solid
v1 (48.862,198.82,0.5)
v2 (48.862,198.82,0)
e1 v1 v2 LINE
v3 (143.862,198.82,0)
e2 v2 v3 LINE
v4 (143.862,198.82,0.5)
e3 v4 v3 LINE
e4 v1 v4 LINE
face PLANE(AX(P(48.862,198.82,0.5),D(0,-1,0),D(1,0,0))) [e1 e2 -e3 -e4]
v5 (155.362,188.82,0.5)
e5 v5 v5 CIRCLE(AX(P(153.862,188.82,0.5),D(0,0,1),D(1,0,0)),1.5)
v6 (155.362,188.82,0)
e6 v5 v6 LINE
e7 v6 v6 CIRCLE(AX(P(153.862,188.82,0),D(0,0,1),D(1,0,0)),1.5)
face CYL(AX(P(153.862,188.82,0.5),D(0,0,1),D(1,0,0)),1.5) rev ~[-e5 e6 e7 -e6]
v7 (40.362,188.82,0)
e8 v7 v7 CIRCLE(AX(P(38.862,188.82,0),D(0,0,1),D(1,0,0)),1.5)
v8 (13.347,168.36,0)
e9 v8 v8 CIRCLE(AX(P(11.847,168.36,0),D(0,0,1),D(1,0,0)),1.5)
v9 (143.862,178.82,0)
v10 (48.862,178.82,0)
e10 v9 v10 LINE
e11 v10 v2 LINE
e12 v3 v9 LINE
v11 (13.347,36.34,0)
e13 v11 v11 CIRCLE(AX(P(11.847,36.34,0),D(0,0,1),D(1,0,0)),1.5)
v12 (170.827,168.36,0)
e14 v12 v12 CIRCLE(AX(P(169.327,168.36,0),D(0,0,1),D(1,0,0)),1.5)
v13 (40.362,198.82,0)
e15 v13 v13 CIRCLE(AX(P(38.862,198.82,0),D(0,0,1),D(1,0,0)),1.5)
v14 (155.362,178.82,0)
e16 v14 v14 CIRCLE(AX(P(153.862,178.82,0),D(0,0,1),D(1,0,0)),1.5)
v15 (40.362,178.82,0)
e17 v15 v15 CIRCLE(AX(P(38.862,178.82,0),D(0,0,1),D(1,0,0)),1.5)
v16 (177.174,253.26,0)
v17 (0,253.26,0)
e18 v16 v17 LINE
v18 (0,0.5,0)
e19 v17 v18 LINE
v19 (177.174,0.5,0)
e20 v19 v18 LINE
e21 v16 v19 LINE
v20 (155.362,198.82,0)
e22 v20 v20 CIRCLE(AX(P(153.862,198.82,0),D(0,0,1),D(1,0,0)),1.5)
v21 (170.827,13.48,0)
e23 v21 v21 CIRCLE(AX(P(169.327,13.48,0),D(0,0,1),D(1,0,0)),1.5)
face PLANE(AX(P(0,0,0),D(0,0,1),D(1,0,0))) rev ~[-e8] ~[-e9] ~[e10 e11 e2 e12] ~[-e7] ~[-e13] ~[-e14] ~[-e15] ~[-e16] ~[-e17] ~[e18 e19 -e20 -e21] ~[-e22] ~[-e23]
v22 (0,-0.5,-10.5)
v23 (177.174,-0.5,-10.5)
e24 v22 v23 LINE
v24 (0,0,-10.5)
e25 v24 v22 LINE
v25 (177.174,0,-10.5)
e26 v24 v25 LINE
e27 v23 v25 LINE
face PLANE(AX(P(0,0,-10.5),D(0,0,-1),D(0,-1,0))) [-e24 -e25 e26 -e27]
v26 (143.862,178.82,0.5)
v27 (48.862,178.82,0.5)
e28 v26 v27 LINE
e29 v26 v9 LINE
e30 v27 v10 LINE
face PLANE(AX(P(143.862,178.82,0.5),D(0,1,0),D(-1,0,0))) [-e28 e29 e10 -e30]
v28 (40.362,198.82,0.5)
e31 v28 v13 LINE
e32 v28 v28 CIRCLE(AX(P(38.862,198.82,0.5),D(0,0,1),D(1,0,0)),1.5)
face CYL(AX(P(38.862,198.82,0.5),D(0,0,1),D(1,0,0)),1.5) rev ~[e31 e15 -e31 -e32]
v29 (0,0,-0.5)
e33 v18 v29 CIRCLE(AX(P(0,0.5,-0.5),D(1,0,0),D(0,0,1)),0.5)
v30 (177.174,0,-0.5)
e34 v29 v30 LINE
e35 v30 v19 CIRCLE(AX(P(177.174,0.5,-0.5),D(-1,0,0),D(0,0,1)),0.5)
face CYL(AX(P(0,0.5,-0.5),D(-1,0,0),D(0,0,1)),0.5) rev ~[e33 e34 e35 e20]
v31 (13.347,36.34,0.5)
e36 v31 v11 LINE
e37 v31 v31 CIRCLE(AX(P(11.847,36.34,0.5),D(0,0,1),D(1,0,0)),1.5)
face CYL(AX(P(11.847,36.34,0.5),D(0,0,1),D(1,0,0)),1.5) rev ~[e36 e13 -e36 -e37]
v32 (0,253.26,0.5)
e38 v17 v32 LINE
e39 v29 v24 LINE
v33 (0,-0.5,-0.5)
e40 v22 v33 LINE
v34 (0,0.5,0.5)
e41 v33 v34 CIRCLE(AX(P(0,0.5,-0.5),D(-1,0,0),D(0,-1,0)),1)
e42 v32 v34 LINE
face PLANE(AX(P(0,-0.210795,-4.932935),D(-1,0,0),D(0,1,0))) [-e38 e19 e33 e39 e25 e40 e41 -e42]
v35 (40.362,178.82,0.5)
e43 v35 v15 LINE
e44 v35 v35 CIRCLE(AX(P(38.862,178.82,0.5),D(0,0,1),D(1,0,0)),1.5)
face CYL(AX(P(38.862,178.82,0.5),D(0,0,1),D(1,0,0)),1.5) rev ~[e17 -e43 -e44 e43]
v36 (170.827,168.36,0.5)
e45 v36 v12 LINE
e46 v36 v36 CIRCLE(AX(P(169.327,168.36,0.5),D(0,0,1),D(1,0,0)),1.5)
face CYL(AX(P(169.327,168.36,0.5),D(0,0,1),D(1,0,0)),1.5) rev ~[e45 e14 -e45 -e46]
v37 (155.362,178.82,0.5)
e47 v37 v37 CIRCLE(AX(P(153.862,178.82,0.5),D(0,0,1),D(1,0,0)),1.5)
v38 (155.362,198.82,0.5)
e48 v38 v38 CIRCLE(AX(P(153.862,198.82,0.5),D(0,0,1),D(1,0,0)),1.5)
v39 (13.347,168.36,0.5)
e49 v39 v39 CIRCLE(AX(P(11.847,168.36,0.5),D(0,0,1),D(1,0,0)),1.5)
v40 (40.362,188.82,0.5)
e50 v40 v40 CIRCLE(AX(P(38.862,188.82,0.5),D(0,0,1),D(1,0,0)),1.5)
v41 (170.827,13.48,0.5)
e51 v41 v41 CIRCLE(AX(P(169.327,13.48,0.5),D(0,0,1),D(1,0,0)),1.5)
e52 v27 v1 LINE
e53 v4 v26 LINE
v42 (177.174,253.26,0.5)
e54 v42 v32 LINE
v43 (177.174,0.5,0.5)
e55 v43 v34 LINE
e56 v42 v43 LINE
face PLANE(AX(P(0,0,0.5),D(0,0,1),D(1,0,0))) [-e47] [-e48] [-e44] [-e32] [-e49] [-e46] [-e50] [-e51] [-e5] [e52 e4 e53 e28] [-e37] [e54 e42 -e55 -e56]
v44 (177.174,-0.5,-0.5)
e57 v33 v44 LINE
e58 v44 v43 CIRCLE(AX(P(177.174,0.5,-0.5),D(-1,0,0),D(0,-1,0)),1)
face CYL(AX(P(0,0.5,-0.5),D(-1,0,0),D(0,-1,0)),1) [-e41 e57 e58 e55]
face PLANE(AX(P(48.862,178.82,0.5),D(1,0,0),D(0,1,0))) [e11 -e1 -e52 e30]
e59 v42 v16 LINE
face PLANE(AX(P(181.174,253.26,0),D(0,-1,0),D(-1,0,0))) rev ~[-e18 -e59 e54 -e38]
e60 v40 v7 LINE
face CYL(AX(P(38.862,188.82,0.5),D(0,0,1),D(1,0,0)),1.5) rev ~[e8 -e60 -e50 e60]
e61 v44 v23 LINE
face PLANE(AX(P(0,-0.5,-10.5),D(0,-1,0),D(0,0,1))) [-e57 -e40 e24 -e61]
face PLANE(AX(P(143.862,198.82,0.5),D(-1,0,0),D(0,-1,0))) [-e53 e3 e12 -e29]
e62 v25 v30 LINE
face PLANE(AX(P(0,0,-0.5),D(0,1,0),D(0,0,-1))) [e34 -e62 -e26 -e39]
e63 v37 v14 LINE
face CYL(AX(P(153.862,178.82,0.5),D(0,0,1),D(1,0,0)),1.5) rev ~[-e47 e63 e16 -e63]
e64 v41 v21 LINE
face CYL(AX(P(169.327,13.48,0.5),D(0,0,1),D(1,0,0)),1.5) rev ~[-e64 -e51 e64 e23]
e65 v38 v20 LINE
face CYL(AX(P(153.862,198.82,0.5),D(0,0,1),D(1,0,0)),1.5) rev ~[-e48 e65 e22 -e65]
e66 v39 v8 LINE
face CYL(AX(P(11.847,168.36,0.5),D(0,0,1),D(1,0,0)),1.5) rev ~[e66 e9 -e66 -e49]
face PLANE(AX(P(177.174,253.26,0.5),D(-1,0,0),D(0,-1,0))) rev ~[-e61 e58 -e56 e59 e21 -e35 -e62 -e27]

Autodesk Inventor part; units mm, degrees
ref_plane "YZ Plane" through (0, 0, 0) normal (1, 0, 0) x (0, 1, 0)
ref_plane "XZ Plane" through (0, 0, 0) normal (0, 1, 0) x (-1, 0, 0)
ref_plane "XY Plane" through (0, 0, 0) normal (0, 0, 1) x (1, 0, 0)
sketch "Sketch1" plane through (0, 0, 0) normal (0, 0, 1) x (1, 0, 0)
  line L0 (0, 0) -> (181.174, 0)
  line L1 (181.174, 0) -> (181.174, 253.26)
  line L2 (181.174, 253.26) -> (0, 253.26)
  line L3 (0, 253.26) -> (0, 0)
  dimension "d0" = 181.174
  dimension "d1" = 253.26
extrude "Plate1" add sketch "Sketch1" along normal blind 0.5
sketch "Sketch3" plane through (0, 0, 0.5) normal (0, 0, 1) x (1, 0, 0)
  line L0 (181.174, 253.26) -> (181.174, 0) projected
  line L1 (181.174, 253.26) -> (181.174, 168.36) construction
  line L2 (181.174, 168.36) -> (169.327, 168.36) construction
  line L3 (169.327, 168.36) -> (11.847, 168.36) construction
  line L4 (169.327, 168.36) -> (169.327, 13.48) construction
  circle A0 centre (169.327, 13.48) radius 1.5
  circle A1 centre (169.327, 168.36) radius 1.5
  circle A2 centre (11.847, 168.36) radius 1.5
  point P0 (181.174, 0.5)
  point P1 (0, 0)
  dimension "d13" = 84.9
  dimension "d14" = 11.847
  dimension "d15" = 157.48
  dimension "d16" = 154.88
  dimension "d17" = 3
  dimension "d18" = 3
  dimension "d19" = 3
extrude "Extrusion1" cut sketch "Sketch3" against normal blind 10
sketch "Sketch5" plane through (0, 0, 0.5) normal (0, 0, 1) x (1, 0, 0)
  circle A0 centre (11.847, 168.36) radius 1.5 projected
  line L0 (11.847, 168.36) -> (11.847, 35.808) construction
  line L1 (11.847, 168.36) -> (144.399, 168.36) construction
  line L2 (11.847, 35.808) -> (11.847, 36.34) construction
  circle A1 centre (11.847, 36.34) radius 1.5
  point P0 (0, 0)
  dimension "d28" = 90
  dimension "d32" = 0.532
  dimension "d33" = 3
extrude "Extrusion4" cut sketch "Sketch5" against normal blind 10 contours A1
sketch "Sketch7" plane through (0, 0, 0) normal (0, -1, 0) x (1, 0, 0)
  line L0 (181.174, 0) -> (0, 0)
  line L1 (0, 0) -> (0, -10.5)
  line L2 (0, -10.5) -> (181.174, -10.5)
  line L3 (181.174, -10.5) -> (181.174, 0)
edge flange "Flange2" height 11 angle 90 thickness 0.5 bend radius 0.5 thickness toward (0, -1, 0) relief tear relief width 0.5 relief depth 0.25 edges at (90.587, 0, 0) wall of the first edge with corners at (181.174, 0, 0) (0, 0, 0) (0, 0, -10.5) (181.174, 0, -10.5)
bend "Bend2"
corner "Corner2"
sketch "Sketch8" plane through (0, 0, 0.5) normal (0, 0, 1) x (1, 0, 0)
  line L0 (181.174, 253.26) -> (0, 253.26) projected
  line L1 (181.174, 253.26) -> (177.174, 253.26)
  line L2 (177.174, 253.26) -> (177.174, -19.1311)
  line L3 (177.174, -19.1311) -> (181.174, -19.1311)
  line L4 (181.174, -19.1311) -> (181.174, 253.26)
  point P0 (0, 0)
  dimension "d46" = 4
extrude "Extrusion5" cut sketch "Sketch8" against normal through all
sketch "Sketch9" plane through (0, 0, 0.5) normal (0, 0, 1) x (1, 0, 0)
  line L0 (177.174, 253.26) -> (177.174, 198.82) construction
  line L1 (177.174, 253.26) -> (177.174, 0.5) construction
  line L2 (177.174, 198.82) -> (153.862, 198.82) construction
  circle A0 centre (153.862, 198.82) radius 1.5
  line L3 (153.862, 198.82) -> (153.862, 188.82) construction
  line L4 (153.862, 188.82) -> (153.862, 178.82) construction
  circle A1 centre (153.862, 188.82) radius 1.5
  circle A2 centre (153.862, 178.82) radius 1.5
  line L5 (153.862, 198.82) -> (38.862, 198.82) construction
  circle A3 centre (38.862, 198.82) radius 1.5
  circle A4 centre (38.862, 188.82) radius 1.5
  circle A5 centre (38.862, 178.82) radius 1.5
  point P0 (0, 0)
  dimension "d49" = 54.44
  dimension "d50" = 23.312
  dimension "d55" = 3
  dimension "d58" = 10
  dimension "d59" = 10
  dimension "d60" = 3
  dimension "d61" = 3
  dimension "d62" = 115
  dimension "d63" = 3
  dimension "d64" = 3
  dimension "d65" = 3
extrude "Extrusion7" cut sketch "Sketch9" against normal blind 10
sketch "Sketch10" plane through (0, 0, 0.5) normal (0, 0, 1) x (1, 0, 0)
  circle A0 centre (153.862, 198.82) radius 1.5 projected
  circle A1 centre (38.862, 198.82) radius 1.5 projected
  line L0 (38.862, 198.82) -> (48.862, 198.82) construction
  line L1 (153.862, 198.82) -> (143.862, 198.82) construction
  line L2 (48.862, 198.82) -> (143.862, 198.82)
  line L3 (143.862, 198.82) -> (143.862, 178.82)
  line L4 (143.862, 178.82) -> (48.862, 178.82)
  line L5 (48.862, 178.82) -> (48.862, 198.82)
  point P0 (0, 0)
  dimension "d68" = 10
  dimension "d69" = 10
  dimension "d70" = 20
extrude "Extrusion8" cut sketch "Sketch10" against normal blind 10 contours L2 L3 L4 L5
equation "\"d2\" = Thickness"
equation "\"d36\" = BendReliefWidth"
equation "\"d37\" = BendReliefDepth"
equation "\"d38\" = MinimumRemnant"
equation "\"d39\" = TransitionRadius"
equation "\"d42\" = BendRadius"
equation "\"d43\" = CornerReliefSize"
equation "\"d44\" = GapSize"
equation "\"d45\" = JacobiRadiusSize"
equation "\"BendRadius\" = Thickness"
equation "\"BendReliefWidth\" = Thickness"
equation "\"BendReliefDepth\" = 0.5 * Thickness"
equation "\"CornerReliefSize\" = 4 * Thickness"
equation "\"MinimumRemnant\" = 2 * Thickness"
equation "\"TransitionRadius\" = BendRadius"
equation "\"JacobiRadiusSize\" = BendRadius"
equation "\"GapSize\" = Thickness"
equation "\"Thickness\" = 0.5"
properties part number "dads trunk"
